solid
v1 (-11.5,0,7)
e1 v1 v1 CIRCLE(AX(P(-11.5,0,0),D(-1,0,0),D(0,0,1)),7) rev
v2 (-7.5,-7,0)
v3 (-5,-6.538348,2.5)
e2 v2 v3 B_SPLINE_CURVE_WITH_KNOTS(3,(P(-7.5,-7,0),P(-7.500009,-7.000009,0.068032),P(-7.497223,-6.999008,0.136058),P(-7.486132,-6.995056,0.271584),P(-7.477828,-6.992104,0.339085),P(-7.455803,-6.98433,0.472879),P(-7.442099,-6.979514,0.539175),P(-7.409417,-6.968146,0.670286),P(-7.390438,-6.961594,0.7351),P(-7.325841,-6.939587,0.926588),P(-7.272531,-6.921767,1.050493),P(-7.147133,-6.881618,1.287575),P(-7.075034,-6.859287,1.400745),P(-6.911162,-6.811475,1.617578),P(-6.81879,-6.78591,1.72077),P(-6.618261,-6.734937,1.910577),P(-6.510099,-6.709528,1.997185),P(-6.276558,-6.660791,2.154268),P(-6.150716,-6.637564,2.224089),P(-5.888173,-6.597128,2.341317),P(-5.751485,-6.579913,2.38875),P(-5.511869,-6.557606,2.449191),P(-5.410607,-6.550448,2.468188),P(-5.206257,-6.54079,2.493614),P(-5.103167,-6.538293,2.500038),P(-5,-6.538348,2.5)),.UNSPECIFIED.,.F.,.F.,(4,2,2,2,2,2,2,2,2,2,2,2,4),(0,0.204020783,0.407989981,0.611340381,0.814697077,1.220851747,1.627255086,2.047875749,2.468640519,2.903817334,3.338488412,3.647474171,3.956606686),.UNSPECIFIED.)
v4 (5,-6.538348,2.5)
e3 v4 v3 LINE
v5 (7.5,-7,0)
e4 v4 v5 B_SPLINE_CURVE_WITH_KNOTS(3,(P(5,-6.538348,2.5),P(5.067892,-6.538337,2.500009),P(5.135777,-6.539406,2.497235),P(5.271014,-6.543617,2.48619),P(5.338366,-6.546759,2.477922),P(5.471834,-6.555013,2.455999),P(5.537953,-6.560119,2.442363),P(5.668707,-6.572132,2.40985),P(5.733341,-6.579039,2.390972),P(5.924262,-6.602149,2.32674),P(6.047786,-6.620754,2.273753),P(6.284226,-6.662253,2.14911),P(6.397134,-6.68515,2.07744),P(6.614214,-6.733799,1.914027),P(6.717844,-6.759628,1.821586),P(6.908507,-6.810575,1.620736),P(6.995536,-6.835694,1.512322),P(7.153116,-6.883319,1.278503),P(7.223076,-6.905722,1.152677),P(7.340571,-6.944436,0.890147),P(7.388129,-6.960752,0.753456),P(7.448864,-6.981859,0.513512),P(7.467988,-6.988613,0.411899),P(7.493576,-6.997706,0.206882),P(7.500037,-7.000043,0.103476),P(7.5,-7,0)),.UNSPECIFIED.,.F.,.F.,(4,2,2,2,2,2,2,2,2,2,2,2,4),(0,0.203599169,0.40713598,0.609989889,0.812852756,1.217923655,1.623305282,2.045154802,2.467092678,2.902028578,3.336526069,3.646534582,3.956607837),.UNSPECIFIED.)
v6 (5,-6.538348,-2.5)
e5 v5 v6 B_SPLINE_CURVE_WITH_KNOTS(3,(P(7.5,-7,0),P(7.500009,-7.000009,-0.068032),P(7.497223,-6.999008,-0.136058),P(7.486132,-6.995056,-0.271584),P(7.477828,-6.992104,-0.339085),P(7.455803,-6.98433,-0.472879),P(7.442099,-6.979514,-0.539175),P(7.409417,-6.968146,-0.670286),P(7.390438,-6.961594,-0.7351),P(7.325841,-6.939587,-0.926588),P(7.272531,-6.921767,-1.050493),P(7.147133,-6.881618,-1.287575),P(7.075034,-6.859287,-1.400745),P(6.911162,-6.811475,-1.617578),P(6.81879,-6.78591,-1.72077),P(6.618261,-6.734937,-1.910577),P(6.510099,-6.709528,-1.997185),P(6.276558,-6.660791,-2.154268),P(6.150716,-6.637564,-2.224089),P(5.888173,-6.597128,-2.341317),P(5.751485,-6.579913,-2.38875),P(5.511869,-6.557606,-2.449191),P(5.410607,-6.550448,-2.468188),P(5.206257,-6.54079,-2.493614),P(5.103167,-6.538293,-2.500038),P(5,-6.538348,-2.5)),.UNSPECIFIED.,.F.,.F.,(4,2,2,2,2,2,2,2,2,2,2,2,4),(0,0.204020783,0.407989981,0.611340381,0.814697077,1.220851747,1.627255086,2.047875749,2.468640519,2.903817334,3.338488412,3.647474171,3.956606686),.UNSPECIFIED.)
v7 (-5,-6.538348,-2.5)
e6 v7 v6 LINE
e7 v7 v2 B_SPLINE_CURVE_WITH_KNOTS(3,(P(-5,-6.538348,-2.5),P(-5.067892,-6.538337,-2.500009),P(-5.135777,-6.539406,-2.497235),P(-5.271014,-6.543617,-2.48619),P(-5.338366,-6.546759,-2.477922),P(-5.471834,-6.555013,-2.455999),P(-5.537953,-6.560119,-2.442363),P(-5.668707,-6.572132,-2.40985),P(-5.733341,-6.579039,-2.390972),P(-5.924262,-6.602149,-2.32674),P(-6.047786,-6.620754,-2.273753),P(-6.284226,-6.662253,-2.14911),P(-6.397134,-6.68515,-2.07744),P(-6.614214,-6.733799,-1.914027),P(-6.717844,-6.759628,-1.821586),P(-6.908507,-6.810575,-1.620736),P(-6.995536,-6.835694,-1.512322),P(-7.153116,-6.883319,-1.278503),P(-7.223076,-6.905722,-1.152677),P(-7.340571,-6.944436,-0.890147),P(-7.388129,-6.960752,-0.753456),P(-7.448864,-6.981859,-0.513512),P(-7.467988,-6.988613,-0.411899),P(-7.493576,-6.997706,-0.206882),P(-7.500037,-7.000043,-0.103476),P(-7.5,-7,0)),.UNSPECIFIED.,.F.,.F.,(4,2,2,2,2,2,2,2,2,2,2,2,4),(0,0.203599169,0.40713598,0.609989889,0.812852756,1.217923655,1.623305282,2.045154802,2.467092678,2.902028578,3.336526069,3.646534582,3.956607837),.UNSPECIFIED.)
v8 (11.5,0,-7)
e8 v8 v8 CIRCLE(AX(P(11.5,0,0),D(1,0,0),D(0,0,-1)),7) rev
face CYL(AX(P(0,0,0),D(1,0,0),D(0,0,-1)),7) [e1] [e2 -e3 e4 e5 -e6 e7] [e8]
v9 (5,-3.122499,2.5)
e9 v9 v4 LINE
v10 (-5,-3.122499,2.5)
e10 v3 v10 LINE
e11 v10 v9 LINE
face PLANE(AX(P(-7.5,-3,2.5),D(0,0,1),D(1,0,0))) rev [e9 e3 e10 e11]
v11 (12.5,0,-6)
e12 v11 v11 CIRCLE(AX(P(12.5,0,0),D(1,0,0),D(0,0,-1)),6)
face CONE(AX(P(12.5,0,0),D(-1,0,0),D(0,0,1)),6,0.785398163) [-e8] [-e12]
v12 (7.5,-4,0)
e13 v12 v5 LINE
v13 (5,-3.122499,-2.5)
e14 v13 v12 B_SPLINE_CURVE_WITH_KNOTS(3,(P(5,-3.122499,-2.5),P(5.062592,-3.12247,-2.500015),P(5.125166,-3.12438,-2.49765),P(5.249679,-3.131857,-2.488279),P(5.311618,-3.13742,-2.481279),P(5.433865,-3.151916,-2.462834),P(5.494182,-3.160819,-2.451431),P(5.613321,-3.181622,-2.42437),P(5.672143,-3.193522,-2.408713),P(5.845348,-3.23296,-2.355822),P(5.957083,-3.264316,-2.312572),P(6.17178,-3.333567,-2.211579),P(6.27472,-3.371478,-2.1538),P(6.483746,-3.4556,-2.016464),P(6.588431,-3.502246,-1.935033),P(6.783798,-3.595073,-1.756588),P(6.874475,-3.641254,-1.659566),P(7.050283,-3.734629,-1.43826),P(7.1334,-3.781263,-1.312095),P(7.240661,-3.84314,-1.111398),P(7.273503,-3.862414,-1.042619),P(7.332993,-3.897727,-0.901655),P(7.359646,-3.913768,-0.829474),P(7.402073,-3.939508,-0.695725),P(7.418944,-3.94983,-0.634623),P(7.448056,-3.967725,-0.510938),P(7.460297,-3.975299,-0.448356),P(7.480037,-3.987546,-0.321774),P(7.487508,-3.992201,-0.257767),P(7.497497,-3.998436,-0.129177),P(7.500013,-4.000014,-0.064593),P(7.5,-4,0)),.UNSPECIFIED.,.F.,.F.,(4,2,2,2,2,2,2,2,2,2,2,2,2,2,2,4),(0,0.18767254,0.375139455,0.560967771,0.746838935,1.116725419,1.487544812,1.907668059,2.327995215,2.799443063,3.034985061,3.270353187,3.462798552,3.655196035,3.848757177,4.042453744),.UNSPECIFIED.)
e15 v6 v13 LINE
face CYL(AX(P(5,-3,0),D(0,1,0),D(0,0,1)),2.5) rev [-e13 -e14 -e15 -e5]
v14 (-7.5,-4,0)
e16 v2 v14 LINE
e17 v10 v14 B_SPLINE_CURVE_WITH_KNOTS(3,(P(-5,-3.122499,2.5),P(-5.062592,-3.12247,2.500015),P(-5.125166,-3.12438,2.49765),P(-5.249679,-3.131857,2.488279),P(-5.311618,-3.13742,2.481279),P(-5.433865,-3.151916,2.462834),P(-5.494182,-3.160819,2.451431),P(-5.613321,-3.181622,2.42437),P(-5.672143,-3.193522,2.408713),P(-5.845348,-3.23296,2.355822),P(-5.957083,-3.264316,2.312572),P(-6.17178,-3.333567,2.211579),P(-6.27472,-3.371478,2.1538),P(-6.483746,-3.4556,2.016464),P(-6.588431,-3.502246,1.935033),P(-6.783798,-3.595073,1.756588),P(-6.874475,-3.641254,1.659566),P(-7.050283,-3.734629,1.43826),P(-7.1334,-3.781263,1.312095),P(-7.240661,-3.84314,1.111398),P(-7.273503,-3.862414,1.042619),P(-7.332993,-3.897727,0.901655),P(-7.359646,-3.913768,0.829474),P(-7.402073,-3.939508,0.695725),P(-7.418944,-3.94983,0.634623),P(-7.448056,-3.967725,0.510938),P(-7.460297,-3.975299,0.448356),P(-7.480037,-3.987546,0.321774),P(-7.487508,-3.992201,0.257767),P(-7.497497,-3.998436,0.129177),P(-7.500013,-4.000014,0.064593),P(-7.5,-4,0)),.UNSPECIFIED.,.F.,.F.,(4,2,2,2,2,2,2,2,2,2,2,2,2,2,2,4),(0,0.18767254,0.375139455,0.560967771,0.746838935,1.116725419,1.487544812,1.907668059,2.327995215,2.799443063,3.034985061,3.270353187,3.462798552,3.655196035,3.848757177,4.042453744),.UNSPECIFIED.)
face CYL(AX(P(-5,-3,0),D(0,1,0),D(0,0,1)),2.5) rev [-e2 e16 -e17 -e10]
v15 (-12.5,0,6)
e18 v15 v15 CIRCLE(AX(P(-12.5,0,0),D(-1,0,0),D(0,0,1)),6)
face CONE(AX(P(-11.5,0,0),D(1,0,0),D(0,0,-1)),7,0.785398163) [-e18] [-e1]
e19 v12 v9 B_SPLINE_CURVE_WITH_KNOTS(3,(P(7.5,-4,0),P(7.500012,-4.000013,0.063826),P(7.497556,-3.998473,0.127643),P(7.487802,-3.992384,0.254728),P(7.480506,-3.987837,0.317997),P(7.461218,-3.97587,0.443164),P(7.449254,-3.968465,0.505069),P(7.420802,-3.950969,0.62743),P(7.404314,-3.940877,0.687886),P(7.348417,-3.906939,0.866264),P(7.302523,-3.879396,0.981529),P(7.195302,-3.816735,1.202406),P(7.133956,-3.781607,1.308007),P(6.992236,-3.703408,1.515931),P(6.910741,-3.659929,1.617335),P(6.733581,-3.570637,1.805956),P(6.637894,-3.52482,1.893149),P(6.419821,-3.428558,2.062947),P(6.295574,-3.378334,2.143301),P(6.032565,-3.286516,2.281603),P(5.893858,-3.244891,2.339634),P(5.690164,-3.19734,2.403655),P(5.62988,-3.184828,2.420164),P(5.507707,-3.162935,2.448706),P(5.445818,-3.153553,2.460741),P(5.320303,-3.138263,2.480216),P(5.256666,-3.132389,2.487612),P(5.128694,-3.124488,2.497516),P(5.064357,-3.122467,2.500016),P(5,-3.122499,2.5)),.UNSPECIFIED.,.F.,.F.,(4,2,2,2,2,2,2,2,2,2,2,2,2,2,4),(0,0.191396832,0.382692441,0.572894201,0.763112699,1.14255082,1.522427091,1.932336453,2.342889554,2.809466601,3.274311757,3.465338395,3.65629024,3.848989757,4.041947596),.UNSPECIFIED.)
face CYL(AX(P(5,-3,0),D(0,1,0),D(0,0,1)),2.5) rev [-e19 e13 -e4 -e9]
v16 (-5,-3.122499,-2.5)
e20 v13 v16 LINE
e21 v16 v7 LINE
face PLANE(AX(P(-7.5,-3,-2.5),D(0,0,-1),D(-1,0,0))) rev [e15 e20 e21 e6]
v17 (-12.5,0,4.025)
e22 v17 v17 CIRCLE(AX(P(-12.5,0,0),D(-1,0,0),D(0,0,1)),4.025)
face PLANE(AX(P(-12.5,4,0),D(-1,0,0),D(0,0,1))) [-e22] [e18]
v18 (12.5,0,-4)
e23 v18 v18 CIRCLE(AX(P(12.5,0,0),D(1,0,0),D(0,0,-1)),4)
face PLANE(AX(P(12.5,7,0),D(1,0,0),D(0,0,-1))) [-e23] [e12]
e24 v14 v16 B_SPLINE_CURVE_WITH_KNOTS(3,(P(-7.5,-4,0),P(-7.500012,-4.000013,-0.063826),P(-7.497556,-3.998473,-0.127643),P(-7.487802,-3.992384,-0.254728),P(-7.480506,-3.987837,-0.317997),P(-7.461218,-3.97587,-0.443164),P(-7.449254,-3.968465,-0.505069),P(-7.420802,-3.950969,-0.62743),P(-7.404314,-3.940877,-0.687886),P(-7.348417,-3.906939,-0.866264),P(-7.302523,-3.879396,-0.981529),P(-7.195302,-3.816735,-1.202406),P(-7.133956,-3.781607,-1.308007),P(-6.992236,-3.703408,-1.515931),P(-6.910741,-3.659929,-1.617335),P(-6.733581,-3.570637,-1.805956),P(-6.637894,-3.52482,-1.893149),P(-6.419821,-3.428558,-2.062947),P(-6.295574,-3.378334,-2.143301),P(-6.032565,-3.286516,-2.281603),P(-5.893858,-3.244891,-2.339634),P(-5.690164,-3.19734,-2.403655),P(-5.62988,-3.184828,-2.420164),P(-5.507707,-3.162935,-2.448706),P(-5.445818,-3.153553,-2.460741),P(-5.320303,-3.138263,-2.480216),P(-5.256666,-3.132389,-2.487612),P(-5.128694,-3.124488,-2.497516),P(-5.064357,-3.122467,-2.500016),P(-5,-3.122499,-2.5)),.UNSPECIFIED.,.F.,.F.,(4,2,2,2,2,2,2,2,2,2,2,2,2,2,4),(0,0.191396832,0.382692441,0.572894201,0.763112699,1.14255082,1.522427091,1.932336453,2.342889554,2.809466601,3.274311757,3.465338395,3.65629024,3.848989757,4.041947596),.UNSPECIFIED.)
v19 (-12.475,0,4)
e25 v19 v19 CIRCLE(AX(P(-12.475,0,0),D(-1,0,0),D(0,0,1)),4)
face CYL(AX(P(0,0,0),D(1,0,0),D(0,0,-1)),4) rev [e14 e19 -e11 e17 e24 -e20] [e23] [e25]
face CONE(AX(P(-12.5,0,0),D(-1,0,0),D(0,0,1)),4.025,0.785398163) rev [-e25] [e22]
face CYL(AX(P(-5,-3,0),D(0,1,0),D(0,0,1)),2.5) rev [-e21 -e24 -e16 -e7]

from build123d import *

# Parameters (mm, degrees)
SKETCH_1_W                      = 25
SKETCH_1_H                      = 3
HOLE_WIZARD_8_0_8_1_D           = 8
HOLE_WIZARD_8_0_8_1_DEPTH       = 5
HOLE_WIZARD_8_0_8_1_CSINK_D     = 8.05
HOLE_WIZARD_8_0_8_1_CSINK_ANGLE = 90
HOLE_WIZARD_8_0_8_1_TIP         = 2.403442476
SKETCH_3_W                      = 15
SKETCH_3_H                      = 5
CUT_EXTRUDE_1_DEPTH             = 4
FILLET_1_R                      = 2.5
CHAMFER_1_SIZE                  = 1


with BuildPart() as part:
    # Эскиз1 → Повернуть1 (revolve)
    with BuildSketch(Plane.XY, mode=Mode.PRIVATE) as revolve_1_sk:
        with Locations((0, 5.5)):
            Rectangle(SKETCH_1_W, SKETCH_1_H)
    revolve(revolve_1_sk.sketch.rotate(Axis((0, 0, 0), (-1, 0, 0)), 90), axis=Axis((0, 0, 0), (-1, 0, 0)))

    # Диаметр отверстия Ø8.0 (8)1
    with Locations(Plane.ZY.offset(12.5)):
        with Locations((0, 0)):
            CounterSinkHole(HOLE_WIZARD_8_0_8_1_D / 2, HOLE_WIZARD_8_0_8_1_CSINK_D / 2, depth=HOLE_WIZARD_8_0_8_1_DEPTH, counter_sink_angle=HOLE_WIZARD_8_0_8_1_CSINK_ANGLE)
            with Locations((0, 0, -(HOLE_WIZARD_8_0_8_1_DEPTH + HOLE_WIZARD_8_0_8_1_TIP / 2))):  # 118° drill point
                Cone(0, HOLE_WIZARD_8_0_8_1_D / 2, HOLE_WIZARD_8_0_8_1_TIP, mode=Mode.SUBTRACT)

    # Эскиз3 → Вырез-Вытянуть1 (cut)
    with BuildSketch(Plane(origin=(0, -7, 0), x_dir=(-1, 0, 0), z_dir=(0, -1, 0))):
        Rectangle(SKETCH_3_W, SKETCH_3_H)
    extrude(amount=-CUT_EXTRUDE_1_DEPTH, mode=Mode.SUBTRACT)

    # Скругление1
    fillet_1_edges = [part.edges().sort_by_distance(p)[0] for p in [
        (-7.5, -4.830423707, 2.5),
        (-7.5, -4.830423707, -2.5),
        (7.5, -4.830423707, 2.5),
        (7.5, -4.830423707, -2.5),
    ]]
    fillet(fillet_1_edges, radius=FILLET_1_R - 0.0001)  # a hair under: the kernel refuses the full size

    # Фаска1
    chamfer_1_edges = [part.edges().sort_by_distance(p)[0] for p in [
        (12.5, 0, 7),
        (-12.5, 0, 7),
    ]]
    chamfer(chamfer_1_edges, length=CHAMFER_1_SIZE)


solid = part.part
